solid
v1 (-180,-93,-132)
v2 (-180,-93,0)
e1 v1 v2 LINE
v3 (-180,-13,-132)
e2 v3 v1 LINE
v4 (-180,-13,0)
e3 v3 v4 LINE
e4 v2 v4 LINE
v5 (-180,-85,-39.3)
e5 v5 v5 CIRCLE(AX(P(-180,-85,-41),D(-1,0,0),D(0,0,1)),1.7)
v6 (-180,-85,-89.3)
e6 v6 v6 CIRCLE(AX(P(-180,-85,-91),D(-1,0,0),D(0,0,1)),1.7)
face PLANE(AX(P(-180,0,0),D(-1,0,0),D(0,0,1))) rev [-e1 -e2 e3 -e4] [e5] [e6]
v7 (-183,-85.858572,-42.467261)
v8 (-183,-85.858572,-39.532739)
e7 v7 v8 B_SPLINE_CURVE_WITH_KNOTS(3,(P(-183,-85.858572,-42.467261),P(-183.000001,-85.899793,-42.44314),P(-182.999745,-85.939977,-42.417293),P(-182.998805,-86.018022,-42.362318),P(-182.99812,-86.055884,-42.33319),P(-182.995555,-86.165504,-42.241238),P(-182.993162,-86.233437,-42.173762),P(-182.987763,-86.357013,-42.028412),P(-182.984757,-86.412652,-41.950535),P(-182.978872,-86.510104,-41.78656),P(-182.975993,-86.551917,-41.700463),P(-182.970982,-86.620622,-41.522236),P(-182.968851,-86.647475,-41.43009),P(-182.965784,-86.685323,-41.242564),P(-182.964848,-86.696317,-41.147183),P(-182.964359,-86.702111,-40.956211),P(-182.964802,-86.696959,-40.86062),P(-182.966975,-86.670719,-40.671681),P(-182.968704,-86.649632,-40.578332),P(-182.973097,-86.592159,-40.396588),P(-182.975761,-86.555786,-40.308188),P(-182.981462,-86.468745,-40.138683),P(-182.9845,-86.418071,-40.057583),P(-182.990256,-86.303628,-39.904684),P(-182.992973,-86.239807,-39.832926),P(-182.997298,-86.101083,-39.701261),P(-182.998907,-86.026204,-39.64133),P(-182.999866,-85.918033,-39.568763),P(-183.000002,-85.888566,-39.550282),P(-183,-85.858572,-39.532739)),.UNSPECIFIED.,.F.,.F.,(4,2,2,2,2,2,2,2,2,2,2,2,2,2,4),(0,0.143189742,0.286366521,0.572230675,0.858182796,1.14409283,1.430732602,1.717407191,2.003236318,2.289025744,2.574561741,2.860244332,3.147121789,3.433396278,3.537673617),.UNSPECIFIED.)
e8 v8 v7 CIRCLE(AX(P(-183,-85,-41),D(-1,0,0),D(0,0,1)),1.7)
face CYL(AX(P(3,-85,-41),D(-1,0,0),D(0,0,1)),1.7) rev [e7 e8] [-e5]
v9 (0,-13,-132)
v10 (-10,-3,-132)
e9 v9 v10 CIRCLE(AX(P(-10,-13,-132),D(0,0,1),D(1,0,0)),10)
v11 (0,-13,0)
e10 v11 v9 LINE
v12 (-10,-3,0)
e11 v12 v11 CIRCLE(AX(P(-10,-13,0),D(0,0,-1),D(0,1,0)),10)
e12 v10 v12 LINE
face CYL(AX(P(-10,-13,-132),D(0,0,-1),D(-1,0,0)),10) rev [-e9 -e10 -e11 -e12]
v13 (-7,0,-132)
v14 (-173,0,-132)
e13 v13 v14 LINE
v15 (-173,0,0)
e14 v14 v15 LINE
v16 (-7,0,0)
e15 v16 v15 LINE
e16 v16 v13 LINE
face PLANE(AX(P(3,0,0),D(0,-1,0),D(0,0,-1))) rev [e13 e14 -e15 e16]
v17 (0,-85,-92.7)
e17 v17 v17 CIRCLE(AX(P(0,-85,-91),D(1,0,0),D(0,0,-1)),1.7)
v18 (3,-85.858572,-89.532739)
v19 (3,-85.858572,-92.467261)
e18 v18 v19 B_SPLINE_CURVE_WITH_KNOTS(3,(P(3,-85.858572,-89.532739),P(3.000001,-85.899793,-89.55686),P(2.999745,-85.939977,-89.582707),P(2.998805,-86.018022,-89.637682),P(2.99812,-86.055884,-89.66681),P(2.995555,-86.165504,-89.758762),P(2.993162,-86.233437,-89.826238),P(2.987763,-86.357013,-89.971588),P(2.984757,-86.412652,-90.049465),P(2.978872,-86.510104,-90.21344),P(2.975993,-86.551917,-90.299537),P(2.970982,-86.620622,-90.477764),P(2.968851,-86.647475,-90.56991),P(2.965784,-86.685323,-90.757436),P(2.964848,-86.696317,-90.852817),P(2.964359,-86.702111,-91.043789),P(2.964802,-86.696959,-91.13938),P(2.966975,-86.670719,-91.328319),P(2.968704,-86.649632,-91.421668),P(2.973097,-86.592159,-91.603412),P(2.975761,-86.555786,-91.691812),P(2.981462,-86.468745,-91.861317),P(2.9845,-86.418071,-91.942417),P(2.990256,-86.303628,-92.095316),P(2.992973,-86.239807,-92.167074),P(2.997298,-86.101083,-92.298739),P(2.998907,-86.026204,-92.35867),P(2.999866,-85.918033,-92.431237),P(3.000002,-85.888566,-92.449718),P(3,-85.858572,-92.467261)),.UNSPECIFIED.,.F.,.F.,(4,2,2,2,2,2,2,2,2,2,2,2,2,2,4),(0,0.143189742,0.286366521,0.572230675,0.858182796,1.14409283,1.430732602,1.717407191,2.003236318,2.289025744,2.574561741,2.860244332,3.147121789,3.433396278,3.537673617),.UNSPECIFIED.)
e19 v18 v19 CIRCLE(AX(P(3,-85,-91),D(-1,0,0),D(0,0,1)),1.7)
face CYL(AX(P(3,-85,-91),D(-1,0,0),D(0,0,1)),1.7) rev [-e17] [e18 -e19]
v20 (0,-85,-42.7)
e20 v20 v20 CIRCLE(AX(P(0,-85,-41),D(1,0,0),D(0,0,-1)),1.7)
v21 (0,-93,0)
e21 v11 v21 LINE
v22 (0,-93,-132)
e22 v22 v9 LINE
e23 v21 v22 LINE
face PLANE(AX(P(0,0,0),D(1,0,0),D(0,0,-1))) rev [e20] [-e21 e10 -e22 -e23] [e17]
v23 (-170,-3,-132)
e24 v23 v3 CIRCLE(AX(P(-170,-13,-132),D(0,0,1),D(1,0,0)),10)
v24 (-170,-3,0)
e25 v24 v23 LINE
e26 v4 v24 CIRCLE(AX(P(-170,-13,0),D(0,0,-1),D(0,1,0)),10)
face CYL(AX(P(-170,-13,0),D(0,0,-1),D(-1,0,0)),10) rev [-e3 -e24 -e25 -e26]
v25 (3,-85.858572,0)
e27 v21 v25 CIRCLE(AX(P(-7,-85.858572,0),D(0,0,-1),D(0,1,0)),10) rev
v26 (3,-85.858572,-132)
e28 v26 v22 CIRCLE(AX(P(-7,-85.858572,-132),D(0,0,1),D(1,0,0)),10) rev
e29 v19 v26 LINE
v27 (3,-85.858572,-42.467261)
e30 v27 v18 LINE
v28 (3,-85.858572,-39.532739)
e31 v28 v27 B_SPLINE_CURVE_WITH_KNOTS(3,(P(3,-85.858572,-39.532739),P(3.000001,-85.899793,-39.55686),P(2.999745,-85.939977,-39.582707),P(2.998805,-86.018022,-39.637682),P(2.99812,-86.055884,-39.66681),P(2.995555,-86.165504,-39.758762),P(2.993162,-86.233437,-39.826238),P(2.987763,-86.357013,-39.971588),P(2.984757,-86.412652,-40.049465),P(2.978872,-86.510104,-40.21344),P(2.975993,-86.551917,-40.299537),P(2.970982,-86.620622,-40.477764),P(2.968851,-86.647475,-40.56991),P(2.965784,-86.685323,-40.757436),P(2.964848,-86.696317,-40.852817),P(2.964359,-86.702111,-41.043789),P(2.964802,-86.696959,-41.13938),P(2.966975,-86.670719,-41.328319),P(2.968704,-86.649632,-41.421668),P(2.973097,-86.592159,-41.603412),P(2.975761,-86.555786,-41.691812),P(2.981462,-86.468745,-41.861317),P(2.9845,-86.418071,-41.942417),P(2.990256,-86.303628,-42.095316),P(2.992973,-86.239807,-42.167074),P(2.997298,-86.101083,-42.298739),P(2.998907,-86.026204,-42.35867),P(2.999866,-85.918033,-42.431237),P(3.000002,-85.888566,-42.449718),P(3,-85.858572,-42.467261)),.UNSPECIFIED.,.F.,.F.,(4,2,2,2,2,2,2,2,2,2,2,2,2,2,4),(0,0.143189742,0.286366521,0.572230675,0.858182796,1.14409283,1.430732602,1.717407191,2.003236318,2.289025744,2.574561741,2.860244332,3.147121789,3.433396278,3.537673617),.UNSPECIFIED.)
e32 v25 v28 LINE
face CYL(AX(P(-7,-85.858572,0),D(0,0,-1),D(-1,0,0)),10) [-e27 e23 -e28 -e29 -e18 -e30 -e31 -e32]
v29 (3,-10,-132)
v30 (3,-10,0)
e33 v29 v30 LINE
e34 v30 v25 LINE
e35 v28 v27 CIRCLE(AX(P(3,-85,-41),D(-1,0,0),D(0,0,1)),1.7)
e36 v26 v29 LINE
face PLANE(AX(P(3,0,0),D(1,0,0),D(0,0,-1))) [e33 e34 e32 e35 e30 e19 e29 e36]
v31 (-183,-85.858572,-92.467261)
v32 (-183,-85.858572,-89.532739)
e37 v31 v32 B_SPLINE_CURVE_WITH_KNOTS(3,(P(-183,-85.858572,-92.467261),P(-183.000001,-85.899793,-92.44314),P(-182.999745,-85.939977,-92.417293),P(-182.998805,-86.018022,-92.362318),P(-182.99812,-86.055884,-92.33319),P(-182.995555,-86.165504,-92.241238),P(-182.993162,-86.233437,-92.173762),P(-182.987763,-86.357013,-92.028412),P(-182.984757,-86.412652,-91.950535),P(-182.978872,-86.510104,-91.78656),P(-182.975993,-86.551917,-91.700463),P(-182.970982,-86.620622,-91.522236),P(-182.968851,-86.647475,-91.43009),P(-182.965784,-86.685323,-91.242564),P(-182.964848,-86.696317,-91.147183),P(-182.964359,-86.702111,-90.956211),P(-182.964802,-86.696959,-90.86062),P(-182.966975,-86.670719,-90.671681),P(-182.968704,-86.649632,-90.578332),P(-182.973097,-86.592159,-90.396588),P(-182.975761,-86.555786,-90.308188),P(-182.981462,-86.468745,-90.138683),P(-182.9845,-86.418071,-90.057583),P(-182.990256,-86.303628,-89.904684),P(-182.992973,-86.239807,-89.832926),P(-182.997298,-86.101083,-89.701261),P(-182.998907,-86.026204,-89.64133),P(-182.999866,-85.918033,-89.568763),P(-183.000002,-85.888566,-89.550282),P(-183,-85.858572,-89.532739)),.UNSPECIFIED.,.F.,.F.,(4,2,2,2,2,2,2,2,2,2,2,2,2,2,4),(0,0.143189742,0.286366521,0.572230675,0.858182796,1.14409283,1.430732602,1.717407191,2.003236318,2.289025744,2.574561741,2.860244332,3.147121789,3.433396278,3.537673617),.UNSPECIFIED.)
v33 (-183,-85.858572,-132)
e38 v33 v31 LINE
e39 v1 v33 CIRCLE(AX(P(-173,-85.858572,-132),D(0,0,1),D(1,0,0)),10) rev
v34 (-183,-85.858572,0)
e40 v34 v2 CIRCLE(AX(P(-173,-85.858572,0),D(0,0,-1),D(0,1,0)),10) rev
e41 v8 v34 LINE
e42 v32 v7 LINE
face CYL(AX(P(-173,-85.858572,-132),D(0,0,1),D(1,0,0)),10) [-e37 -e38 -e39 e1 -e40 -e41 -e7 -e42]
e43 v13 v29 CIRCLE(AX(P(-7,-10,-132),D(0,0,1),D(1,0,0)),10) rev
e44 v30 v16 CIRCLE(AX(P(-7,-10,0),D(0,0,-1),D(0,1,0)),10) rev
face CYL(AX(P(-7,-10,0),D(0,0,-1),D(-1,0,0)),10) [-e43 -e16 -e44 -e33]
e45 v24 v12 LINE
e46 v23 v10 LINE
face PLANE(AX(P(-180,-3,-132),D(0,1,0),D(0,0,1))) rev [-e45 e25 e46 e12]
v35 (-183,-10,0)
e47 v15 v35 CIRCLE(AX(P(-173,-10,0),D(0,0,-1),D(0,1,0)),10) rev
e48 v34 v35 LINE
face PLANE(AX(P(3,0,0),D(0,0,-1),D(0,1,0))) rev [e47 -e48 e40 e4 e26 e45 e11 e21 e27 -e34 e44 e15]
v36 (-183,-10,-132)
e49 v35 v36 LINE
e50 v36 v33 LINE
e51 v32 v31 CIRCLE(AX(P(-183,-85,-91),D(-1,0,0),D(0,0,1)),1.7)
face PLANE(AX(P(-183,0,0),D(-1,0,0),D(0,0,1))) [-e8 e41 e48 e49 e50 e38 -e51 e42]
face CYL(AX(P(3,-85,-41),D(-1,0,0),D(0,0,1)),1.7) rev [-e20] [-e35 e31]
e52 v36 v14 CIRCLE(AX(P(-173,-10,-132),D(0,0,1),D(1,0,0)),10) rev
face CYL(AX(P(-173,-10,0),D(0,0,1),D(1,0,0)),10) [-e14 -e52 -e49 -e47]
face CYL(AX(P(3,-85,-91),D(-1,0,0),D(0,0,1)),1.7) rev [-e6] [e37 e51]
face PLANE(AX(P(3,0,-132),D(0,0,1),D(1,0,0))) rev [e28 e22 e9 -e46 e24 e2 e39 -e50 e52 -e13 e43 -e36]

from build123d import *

# Parameters (mm, degrees)
SKETCH1_W               = 132
SKETCH1_H               = 93
BOSS_EXTRUDE1_DEPTH     = 3
SKETCH3_W               = 132
SKETCH3_H               = 3
BOSS_EXTRUDE2_DEPTH     = 180
BOSS_EXTRUDE3_START     = 180
SKETCH4_W               = 132
SKETCH4_H               = 93
BOSS_EXTRUDE3_DEPTH     = 3
FILLET1_R               = 10
FILLET2_R               = 10
CUT_EXTRUDE1_DEPTH      = 245.053272873
CUT_EXTRUDE1_DEPTH_BACK = 245.053272873
SKETCH5_R               = 1.7


with BuildPart() as part:
    # Sketch1 → Boss-Extrude1 (new body)
    with BuildSketch(Plane(origin=(0, 0, 0), x_dir=(0, 0, -1), z_dir=(1, 0, 0))):
        with Locations((66, -46.5)):
            Rectangle(SKETCH1_W, SKETCH1_H)
    extrude(amount=BOSS_EXTRUDE1_DEPTH)

    # Sketch3 → Boss-Extrude2 (add)
    with BuildSketch(Plane.ZY):
        with Locations((-66, -1.5)):
            Rectangle(SKETCH3_W, SKETCH3_H)
    extrude(amount=BOSS_EXTRUDE2_DEPTH)

    # Sketch4 → Boss-Extrude3 (add)
    with BuildSketch(Plane.ZY.offset(BOSS_EXTRUDE3_START)):
        with Locations((-66, -46.5)):
            Rectangle(SKETCH4_W, SKETCH4_H)
    extrude(amount=BOSS_EXTRUDE3_DEPTH)

    # Fillet1
    fillet1_edges = [part.edges().sort_by_distance(p)[0] for p in [
        (0, -3, -66),
        (3, 0, -66),
        (-180, -3, -66),
        (-183, 0, -66),
    ]]
    fillet(fillet1_edges, radius=FILLET1_R)

    # Fillet2
    # the kernel refuses this fillet: 10 mm, written as the material it takes off along each edge
    with BuildSketch(Plane(origin=(3, -93, -149.853571071), x_dir=(0, 1, 0), z_dir=(0, 0, 1)), Plane(origin=(-183, -93, 17.853571071), x_dir=(0, 1, 0), z_dir=(0, 0, -1))) as fillet2_piece_1:
        with BuildLine():
            CenterArc((7.141428429, 10), FILLET2_R, 224.427004001, 45.572995999)
            Line((0, 3), (-0.142828569, 2.86))
            ThreePointArc((-0.142828569, 2.86), (-0.2, 1.5), (-0.2, 0))
            Line((-0.2, 0), (0, -0.2))
            Line((0, -0.2), (7.141428429, -0.2))
            Line((7.141428429, -0.2), (7.141428429, 0))
        make_face()
    extrude(amount=167.707142143, mode=Mode.SUBTRACT)

    # Sketch5 → Cut-Extrude1 (cut, two sides: drawn at the far end of the back side and taken through both)
    with BuildSketch(Plane.ZY.offset(-CUT_EXTRUDE1_DEPTH_BACK)):
        with Locations((-91, -85)):
            Circle(SKETCH5_R)
        with Locations((-41, -85)):
            Circle(SKETCH5_R)
    extrude(amount=CUT_EXTRUDE1_DEPTH + CUT_EXTRUDE1_DEPTH_BACK, mode=Mode.SUBTRACT)


solid = part.part
